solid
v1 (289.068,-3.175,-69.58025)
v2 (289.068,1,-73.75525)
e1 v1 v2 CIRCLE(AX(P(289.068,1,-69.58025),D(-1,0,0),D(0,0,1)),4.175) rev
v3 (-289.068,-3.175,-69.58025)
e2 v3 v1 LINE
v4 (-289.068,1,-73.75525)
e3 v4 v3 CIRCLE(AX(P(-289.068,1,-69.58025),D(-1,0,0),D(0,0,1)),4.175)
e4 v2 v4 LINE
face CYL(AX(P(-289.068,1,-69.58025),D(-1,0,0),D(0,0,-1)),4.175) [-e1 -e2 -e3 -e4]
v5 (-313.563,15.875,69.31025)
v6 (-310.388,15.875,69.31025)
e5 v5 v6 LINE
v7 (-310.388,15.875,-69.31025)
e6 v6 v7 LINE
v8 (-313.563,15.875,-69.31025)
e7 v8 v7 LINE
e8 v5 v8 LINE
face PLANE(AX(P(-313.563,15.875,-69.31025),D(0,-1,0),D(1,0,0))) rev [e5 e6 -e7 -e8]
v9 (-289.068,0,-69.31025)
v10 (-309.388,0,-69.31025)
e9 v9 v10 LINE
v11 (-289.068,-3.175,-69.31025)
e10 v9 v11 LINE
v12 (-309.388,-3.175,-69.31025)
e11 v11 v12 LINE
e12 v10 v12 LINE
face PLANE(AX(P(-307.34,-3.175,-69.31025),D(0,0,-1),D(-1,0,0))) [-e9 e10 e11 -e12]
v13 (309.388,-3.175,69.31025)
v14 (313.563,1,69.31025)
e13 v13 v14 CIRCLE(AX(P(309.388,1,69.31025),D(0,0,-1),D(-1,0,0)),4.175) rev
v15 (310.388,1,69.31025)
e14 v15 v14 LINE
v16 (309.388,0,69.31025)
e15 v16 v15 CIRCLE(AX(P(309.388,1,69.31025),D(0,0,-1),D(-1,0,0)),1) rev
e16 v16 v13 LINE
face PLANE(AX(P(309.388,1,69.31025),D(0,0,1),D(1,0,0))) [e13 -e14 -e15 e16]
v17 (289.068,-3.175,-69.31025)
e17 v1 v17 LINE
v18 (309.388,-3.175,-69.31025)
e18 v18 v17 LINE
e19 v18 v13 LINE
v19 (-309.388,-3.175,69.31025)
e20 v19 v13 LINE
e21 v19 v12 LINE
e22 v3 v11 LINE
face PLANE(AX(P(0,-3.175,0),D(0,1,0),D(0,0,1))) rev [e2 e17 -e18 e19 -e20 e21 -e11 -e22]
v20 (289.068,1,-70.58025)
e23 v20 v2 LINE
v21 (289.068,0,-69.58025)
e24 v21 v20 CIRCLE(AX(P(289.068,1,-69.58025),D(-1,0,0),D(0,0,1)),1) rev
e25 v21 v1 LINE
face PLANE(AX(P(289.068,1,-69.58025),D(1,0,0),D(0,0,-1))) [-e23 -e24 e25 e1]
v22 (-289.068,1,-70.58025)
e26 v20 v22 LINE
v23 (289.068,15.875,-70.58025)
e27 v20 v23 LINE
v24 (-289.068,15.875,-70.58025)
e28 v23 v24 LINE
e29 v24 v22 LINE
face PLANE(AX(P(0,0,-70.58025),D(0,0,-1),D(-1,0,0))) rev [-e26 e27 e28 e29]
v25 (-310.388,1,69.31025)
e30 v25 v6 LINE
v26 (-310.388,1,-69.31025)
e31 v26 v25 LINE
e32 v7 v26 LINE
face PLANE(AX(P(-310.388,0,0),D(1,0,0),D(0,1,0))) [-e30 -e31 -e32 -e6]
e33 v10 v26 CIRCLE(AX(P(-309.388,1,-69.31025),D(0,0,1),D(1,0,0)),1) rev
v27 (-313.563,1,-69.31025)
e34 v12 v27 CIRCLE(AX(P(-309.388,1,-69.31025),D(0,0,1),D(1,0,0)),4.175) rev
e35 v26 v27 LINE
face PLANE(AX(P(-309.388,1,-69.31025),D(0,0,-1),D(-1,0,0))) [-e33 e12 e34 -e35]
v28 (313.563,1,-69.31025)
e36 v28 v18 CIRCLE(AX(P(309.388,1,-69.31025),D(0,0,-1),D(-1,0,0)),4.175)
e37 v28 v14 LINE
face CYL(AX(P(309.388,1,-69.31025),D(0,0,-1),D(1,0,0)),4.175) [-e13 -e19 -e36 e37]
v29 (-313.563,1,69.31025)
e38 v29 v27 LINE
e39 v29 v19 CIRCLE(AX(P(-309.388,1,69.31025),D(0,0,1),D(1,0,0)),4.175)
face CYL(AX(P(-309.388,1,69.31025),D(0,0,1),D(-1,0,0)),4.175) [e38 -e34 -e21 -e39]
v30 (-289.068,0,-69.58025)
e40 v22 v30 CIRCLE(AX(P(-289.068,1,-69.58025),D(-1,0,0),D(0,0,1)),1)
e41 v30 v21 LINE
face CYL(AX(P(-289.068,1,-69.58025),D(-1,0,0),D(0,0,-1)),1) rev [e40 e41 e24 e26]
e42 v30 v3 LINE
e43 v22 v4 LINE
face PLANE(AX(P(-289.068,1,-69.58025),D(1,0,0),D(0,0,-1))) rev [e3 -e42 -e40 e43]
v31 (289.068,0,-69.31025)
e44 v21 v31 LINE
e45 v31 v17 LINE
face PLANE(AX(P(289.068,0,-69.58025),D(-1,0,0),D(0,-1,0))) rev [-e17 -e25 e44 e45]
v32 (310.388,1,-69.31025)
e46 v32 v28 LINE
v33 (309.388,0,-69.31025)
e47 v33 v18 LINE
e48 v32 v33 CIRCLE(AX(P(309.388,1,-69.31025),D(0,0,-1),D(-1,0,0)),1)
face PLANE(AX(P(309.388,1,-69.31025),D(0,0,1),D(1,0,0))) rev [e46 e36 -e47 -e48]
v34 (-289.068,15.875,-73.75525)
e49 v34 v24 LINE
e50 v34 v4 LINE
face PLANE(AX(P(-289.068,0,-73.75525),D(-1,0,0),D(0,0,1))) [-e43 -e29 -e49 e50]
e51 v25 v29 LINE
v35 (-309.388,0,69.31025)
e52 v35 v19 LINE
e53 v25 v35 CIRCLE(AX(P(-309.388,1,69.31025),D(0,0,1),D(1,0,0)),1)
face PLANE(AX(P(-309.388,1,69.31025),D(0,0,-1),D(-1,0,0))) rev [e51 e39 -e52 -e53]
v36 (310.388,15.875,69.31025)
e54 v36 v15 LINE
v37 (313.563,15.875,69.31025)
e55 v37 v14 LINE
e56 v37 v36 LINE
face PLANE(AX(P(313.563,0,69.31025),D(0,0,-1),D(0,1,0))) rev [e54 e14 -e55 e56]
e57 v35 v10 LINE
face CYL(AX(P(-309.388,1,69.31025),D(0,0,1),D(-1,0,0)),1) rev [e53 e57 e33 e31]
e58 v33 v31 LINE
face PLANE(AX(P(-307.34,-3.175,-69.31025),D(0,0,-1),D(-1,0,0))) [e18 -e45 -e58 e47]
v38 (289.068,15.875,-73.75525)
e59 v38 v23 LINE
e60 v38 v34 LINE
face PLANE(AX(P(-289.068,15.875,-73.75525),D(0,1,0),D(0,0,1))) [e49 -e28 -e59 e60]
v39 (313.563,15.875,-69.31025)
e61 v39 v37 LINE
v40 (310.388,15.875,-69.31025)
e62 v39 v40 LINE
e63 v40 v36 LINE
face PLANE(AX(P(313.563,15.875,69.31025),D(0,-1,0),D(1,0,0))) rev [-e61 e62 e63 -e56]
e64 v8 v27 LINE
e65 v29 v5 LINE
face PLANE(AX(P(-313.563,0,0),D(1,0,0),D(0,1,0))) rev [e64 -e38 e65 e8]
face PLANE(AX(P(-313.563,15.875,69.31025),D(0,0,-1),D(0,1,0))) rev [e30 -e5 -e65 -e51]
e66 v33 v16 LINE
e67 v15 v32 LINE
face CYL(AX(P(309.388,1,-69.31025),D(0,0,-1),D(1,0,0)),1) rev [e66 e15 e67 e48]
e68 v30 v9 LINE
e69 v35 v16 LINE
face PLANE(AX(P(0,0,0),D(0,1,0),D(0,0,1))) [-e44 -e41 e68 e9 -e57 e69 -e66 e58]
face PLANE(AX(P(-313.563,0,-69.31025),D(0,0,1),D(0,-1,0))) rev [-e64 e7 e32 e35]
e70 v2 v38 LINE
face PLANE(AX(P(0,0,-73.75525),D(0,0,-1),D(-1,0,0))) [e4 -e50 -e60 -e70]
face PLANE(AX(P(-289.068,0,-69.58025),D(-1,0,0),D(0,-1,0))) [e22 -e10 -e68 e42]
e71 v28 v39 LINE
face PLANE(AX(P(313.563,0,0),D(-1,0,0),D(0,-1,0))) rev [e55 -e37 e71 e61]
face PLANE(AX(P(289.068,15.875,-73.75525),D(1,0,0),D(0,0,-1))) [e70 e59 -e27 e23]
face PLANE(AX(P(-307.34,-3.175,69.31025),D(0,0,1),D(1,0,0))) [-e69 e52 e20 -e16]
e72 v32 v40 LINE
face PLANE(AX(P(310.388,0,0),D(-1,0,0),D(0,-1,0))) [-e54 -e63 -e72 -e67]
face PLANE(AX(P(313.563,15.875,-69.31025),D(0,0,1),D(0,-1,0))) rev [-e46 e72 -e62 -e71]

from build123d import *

# Parameters (mm, degrees)
SKETCH1_W               = 614.68
SKETCH1_H               = 138.6205
BASE_FLANGE1_DEPTH      = 3.175
EDGE_FLANGE1_DEPTH      = 138.6205
EDGE_FLANGE1_BEND_DEPTH = 138.6205
EDGE_FLANGE2_DEPTH      = 578.136


# Sheet-metal steps are written as plain solids
with BuildPart() as part:
    # Sketch1 → Base-Flange1 (new body)
    with BuildSketch(Plane(origin=(0, 0, 0), x_dir=(1, 0, 0), z_dir=(0, 1, 0))):
        Rectangle(SKETCH1_W, SKETCH1_H)
    extrude(amount=-BASE_FLANGE1_DEPTH)

    # Edge-Flange1 section (across the edge) → Edge-Flange1 (add)
    with BuildSketch(Plane(origin=(-310.388, 0, -69.31025), x_dir=(1, 0, 0), z_dir=(0, 0, 1))):
        with BuildLine():
            Line((-3.175, 1), (-3.175, 15.875))
            Line((-3.175, 15.875), (0, 15.875))
            Line((0, 15.875), (0, 1))
            ThreePointArc((0, 1), (0.292893219, 0.292893219), (1, 0))
            Line((1, 0), (3.048, 0))
            Line((3.048, 0), (3.048, -3.175))
            Line((3.048, -3.175), (1, -3.175))
            ThreePointArc((1, -3.175), (-1.952170811, -1.952170811), (-3.175, 1))
        make_face()
    extrude(amount=EDGE_FLANGE1_DEPTH)

    # Edge-Flange1 section 2 (across the edge) → Edge-Flange1 bend (add)
    with BuildSketch(Plane(origin=(310.388, 0, 69.31025), x_dir=(-1, 0, 0), z_dir=(0, 0, -1))):
        with BuildLine():
            Line((-3.175, 1), (-3.175, 15.875))
            Line((-3.175, 15.875), (0, 15.875))
            Line((0, 15.875), (0, 1))
            ThreePointArc((0, 1), (0.292893219, 0.292893219), (1, 0))
            Line((1, 0), (3.048, 0))
            Line((3.048, 0), (3.048, -3.175))
            Line((3.048, -3.175), (1, -3.175))
            ThreePointArc((1, -3.175), (-1.952170811, -1.952170811), (-3.175, 1))
        make_face()
    extrude(amount=EDGE_FLANGE1_BEND_DEPTH)

    # Edge-Flange2 section (across the edge) → Edge-Flange2 (add)
    with BuildSketch(Plane(origin=(289.068, 0, -70.58025), x_dir=(0, 0, 1), z_dir=(-1, 0, 0))):
        with BuildLine():
            Line((-3.175, 1), (-3.175, 15.875))
            Line((-3.175, 15.875), (0, 15.875))
            Line((0, 15.875), (0, 1))
            ThreePointArc((0, 1), (0.292893219, 0.292893219), (1, 0))
            Line((1, 0), (1.27, 0))
            Line((1.27, 0), (1.27, -3.175))
            Line((1.27, -3.175), (1, -3.175))
            ThreePointArc((1, -3.175), (-1.952170811, -1.952170811), (-3.175, 1))
        make_face()
    extrude(amount=EDGE_FLANGE2_DEPTH)


solid = part.part
